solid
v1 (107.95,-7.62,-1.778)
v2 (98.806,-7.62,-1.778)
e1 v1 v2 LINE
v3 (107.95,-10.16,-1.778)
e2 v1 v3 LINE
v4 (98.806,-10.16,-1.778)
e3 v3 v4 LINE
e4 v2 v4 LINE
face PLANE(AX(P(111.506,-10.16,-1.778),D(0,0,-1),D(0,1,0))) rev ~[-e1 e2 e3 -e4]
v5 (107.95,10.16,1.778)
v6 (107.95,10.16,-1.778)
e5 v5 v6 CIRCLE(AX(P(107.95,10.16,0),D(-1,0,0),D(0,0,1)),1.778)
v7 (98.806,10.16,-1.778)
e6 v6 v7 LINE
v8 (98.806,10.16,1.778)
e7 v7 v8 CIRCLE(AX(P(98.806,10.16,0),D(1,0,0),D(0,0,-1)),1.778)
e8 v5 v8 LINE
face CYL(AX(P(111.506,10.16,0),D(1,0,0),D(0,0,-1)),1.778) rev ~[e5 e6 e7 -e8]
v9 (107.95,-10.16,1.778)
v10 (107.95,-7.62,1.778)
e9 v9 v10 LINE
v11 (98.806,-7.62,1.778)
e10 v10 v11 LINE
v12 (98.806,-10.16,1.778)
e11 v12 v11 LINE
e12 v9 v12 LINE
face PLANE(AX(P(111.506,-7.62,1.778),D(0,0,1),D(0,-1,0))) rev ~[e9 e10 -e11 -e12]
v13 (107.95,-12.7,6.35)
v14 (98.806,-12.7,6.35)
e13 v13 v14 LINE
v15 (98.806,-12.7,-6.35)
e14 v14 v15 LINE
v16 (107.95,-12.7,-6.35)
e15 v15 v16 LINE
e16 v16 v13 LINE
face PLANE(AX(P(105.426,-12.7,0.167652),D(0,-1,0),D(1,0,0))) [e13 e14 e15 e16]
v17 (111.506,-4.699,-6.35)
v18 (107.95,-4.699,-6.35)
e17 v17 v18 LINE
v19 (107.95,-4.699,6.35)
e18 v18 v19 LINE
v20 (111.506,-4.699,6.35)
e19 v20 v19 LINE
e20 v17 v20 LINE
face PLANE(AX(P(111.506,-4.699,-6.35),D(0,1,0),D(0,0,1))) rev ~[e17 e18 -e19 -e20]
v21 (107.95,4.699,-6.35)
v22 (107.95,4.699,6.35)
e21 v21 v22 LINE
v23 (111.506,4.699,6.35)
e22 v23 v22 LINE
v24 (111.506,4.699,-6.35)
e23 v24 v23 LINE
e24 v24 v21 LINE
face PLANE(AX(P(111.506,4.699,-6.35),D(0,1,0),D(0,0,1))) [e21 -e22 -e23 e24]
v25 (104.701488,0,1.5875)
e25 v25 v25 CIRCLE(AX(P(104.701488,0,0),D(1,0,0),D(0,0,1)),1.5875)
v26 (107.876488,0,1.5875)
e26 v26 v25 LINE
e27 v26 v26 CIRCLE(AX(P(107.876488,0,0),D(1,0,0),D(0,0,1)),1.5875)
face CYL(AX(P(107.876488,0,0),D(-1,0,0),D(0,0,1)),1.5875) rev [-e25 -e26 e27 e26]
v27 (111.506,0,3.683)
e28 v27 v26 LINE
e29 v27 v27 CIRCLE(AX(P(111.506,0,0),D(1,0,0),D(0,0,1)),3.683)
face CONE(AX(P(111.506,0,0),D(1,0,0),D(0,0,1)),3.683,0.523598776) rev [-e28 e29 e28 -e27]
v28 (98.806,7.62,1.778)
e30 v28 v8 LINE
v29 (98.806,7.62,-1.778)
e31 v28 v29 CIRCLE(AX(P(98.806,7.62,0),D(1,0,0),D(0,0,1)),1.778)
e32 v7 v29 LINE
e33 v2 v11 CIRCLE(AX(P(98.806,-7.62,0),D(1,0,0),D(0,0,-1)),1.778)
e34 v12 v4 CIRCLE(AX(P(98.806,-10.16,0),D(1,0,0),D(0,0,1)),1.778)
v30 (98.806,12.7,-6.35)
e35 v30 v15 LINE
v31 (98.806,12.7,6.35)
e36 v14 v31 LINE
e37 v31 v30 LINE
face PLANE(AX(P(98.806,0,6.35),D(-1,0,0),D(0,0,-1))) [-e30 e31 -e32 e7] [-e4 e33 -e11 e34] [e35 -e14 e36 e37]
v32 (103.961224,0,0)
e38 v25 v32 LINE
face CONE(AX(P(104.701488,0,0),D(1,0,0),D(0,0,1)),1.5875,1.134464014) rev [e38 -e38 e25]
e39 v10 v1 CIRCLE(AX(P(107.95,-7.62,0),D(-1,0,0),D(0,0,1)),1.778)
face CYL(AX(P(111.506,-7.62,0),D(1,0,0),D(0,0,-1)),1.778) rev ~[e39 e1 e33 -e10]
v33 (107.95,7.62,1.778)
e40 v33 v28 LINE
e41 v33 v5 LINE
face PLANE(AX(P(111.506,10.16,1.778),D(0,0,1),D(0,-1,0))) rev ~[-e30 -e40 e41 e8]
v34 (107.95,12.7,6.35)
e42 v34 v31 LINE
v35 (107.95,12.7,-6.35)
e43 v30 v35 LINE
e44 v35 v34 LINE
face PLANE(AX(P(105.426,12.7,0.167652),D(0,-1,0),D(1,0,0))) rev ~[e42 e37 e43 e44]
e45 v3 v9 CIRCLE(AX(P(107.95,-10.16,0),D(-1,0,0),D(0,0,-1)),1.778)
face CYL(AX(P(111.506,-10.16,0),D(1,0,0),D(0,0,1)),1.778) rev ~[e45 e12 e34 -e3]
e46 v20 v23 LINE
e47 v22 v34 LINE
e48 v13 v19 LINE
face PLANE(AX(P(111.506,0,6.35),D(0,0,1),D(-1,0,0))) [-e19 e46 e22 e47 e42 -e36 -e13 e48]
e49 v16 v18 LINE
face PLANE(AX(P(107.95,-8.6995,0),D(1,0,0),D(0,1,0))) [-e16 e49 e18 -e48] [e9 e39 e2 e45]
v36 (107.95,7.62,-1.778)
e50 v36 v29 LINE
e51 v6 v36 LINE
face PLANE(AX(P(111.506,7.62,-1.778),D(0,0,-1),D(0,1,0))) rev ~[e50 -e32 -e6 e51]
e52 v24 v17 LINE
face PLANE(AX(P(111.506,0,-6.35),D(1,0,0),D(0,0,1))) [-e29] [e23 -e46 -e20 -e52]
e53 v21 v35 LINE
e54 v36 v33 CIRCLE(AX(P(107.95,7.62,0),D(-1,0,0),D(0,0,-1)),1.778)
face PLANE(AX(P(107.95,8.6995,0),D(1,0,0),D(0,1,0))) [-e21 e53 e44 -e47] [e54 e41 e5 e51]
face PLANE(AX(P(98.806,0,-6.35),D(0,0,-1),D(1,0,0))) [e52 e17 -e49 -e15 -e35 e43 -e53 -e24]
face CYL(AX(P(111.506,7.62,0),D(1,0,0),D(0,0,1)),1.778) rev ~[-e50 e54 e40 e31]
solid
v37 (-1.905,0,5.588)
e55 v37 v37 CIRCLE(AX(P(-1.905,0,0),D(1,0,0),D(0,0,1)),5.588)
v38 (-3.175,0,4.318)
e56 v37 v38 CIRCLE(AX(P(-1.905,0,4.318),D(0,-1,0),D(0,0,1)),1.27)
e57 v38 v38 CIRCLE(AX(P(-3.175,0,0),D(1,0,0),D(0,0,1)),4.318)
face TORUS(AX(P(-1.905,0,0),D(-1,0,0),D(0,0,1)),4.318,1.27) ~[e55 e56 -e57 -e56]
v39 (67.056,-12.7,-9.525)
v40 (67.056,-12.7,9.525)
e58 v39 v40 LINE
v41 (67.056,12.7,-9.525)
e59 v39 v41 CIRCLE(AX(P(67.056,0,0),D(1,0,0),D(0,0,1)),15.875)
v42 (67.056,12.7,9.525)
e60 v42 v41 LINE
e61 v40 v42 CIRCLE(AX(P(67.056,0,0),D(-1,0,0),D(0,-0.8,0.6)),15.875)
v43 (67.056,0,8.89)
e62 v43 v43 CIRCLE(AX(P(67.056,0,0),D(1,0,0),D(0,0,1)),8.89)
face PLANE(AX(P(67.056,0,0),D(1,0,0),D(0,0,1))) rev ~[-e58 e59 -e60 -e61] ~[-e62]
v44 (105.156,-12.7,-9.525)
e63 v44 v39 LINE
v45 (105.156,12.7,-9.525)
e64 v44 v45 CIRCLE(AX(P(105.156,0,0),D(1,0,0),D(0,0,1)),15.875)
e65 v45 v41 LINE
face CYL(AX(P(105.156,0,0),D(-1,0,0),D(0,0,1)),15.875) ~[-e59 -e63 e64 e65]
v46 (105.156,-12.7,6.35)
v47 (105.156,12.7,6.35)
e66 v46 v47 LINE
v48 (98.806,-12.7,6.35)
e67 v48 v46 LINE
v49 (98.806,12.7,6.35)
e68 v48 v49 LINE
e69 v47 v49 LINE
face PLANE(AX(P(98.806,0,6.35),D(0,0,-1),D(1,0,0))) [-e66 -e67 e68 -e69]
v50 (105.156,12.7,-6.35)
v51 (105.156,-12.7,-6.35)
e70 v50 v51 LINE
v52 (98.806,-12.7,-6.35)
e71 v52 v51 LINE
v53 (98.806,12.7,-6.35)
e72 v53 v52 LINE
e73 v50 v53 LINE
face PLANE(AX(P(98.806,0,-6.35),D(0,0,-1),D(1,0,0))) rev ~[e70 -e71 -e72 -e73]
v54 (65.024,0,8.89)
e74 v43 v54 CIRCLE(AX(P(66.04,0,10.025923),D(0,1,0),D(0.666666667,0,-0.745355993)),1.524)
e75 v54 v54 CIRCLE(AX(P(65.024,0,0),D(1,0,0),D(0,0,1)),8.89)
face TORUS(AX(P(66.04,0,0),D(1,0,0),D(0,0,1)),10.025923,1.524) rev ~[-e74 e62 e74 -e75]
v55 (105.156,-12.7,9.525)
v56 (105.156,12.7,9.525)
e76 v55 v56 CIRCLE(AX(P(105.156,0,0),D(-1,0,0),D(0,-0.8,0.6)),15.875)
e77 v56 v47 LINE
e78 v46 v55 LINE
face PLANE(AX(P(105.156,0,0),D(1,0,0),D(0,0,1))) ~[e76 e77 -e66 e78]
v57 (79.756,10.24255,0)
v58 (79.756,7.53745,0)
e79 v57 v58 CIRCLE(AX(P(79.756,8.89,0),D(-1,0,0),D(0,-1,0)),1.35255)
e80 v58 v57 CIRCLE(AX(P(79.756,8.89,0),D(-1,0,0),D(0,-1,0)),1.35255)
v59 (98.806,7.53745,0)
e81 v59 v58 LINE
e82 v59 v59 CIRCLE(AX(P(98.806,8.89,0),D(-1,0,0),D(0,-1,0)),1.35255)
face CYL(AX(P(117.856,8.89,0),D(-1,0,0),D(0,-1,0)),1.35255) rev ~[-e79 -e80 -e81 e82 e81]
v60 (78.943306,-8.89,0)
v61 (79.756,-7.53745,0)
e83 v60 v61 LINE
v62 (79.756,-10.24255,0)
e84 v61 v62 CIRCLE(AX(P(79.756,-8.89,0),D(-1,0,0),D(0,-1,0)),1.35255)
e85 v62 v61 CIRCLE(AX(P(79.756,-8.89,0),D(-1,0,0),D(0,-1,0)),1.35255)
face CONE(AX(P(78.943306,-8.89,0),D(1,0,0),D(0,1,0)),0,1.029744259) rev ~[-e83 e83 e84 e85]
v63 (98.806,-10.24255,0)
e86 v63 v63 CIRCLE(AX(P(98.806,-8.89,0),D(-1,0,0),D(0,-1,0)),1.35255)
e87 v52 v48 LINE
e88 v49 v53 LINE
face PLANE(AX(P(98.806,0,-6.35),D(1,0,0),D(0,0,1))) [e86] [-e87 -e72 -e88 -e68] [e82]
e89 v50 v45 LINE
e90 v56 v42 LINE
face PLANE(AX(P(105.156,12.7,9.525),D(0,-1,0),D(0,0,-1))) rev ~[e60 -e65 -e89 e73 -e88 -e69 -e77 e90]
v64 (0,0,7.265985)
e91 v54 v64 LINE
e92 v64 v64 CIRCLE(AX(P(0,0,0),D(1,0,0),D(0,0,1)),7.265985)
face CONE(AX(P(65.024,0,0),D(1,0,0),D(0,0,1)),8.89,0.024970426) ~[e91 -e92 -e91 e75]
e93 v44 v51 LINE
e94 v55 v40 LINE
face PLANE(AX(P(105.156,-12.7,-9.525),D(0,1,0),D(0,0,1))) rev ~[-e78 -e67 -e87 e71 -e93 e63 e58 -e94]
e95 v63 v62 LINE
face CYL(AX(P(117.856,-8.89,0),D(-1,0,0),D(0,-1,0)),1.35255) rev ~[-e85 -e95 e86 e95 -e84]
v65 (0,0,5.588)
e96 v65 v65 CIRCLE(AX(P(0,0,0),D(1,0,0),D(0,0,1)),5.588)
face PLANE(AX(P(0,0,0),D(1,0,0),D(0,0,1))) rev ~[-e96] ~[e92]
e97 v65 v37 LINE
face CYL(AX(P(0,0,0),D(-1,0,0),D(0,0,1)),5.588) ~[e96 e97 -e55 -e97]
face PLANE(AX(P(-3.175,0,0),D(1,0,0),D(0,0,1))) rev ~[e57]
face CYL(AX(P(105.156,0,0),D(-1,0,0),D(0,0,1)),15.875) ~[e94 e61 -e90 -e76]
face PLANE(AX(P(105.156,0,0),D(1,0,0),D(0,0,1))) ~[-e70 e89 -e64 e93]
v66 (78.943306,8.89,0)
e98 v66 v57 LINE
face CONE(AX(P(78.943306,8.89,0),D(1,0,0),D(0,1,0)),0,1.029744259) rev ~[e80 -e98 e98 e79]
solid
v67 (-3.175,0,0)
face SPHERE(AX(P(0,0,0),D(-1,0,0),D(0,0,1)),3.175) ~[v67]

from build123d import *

# Parameters (mm, degrees)
F2_W      = 6.35
F2_H      = 12.7
F3_DEPTH  = 25.4
F6_DEPTH  = 38.1
F8_D      = 2.7051
F8_DEPTH  = 19.05
F8_TIP    = 0.8126940303
F9_DEPTH  = 12.7
F11_DEPTH = 25.4
F13_W     = 8.001
F13_H     = 12.7
F14_DEPTH = 3.556


# Not quite as in the source:
# - a feature names something its author has since deleted; it is built from what else it names


with BuildPart() as f1:
    # F0 (on Front) → F1 (revolve)
    with BuildSketch(Plane.XZ):
        Polygon((0, 5.588), (0, 0), (65.024, 0), (65.024, 8.89), (0, 7.2659854949), align=None)
        with BuildLine():
            Line((-3.175, 0), (0, 0))
            Line((0, 0), (0, 5.588))
            Line((0, 5.588), (-1.905, 5.588))
            ThreePointArc((-1.905, 5.588), (-2.8030256121, 5.2160256121), (-3.175, 4.318))
            Line((-3.175, 4.318), (-3.175, 0))
        make_face()
        with BuildLine():
            Line((65.024, 8.89), (65.024, 0))
            Line((65.024, 0), (67.056, 0))
            Line((67.056, 0), (67.056, 8.89))
            ThreePointArc((67.056, 8.89), (66.04, 8.5019225326), (65.024, 8.89))
        make_face()
        with BuildLine():
            Line((67.056, 8.89), (67.056, 0))
            Line((67.056, 0), (105.156, 0))
            Line((105.156, 0), (105.156, 15.875))
            Line((105.156, 15.875), (67.056, 15.875))
            Line((67.056, 15.875), (67.056, 11.1618450651))
            ThreePointArc((67.056, 11.1618450651), (67.4312152961, 10.6480929272), (67.564, 10.0259225326))
            ThreePointArc((67.564, 10.0259225326), (67.4312152961, 9.4037521379), (67.056, 8.89))
        make_face()
        with BuildLine():
            Line((67.056, 11.1618450651), (67.056, 8.89))
            ThreePointArc((67.056, 8.89), (67.4312152961, 9.4037521379), (67.564, 10.0259225326))
            ThreePointArc((67.564, 10.0259225326), (67.4312152961, 10.6480929272), (67.056, 11.1618450651))
        make_face()
    revolve(axis=Axis((32.512, 0, 0), (1, 0, 0)))

    # F2 (on Front) → F3 (cut, symmetric)
    with BuildSketch(Plane.XZ):
        with Locations((101.981, 0)):
            Rectangle(F2_W, F2_H)
    extrude(amount=F3_DEPTH, both=True, mode=Mode.SUBTRACT)

    # F4 (on face) → F6 (cut)
    with BuildSketch(Plane.YZ.offset(105.156)):
        with BuildLine():
            Line((-12.7, 6.35), (-14.5496778315, 6.35))
            ThreePointArc((-14.5496778315, 6.35), (-15.875, 0), (-14.5496778315, -6.35))
            ThreePointArc((-14.5496778315, -6.35), (-13.7170110348, -7.9911972363), (-12.7, -9.525))
            Line((-12.7, -9.525), (-12.7, 6.35))
        make_face()
        with BuildLine():
            ThreePointArc((-12.7, 9.525), (-13.7170110348, 7.9911972363), (-14.5496778315, 6.35))
            Line((-14.5496778315, 6.35), (-12.7, 6.35))
            Line((-12.7, 6.35), (-12.7, 9.525))
        make_face()
        with BuildLine():
            Line((14.5496778315, 6.35), (12.7, 6.35))
            Line((12.7, 6.35), (12.7, -9.525))
            ThreePointArc((12.7, -9.525), (13.7170110348, -7.9911972363), (14.5496778315, -6.35))
            ThreePointArc((14.5496778315, -6.35), (15.875, 0), (14.5496778315, 6.35))
        make_face()
        with BuildLine():
            Line((12.7, 9.525), (12.7, 6.35))
            Line((12.7, 6.35), (14.5496778315, 6.35))
            ThreePointArc((14.5496778315, 6.35), (13.7170110348, 7.9911972363), (12.7, 9.525))
        make_face()
    extrude(amount=-F6_DEPTH, mode=Mode.SUBTRACT)

    # F8
    with Locations(Plane.YZ.offset(98.806)):
        with Locations((-8.89, 0), (8.89, 0)):
            Hole(F8_D / 2, depth=F8_DEPTH)
            with Locations((0, 0, -(F8_DEPTH + F8_TIP / 2))):  # 118° drill point
                Cone(0, F8_D / 2, F8_TIP, mode=Mode.SUBTRACT)


with BuildPart() as f9:
    # F5 (on Front) → F9 (new body, symmetric)
    with BuildSketch(Plane.XZ):
        Polygon((98.806, 6.35), (98.806, -6.35), (111.506, -6.35), (111.506, -3.683), (111.506, 0), (103.9612241254, 0), (104.7014875327, 1.5875), (107.8764875327, 1.5875), (111.506, 3.683), (111.506, 6.35), align=None)
        Polygon((103.9612241254, 0), (111.506, 0), (111.506, 3.683), (107.8764875327, 1.5875), (104.7014875327, 1.5875), align=None)
    extrude(amount=F9_DEPTH, both=True)

    # F10 (on face) → F11 (cut)
    with BuildSketch(Plane.YZ.offset(111.506)):
        with BuildLine():
            ThreePointArc((7.62, 1.778), (5.842, 0), (7.62, -1.778))
            Line((7.62, -1.778), (10.16, -1.778))
            ThreePointArc((10.16, -1.778), (11.938, 0), (10.16, 1.778))
            Line((10.16, 1.778), (7.62, 1.778))
        make_face()
        with BuildLine():
            ThreePointArc((-10.16, 1.778), (-11.938, 0), (-10.16, -1.778))
            Line((-10.16, -1.778), (-7.62, -1.778))
            ThreePointArc((-7.62, -1.778), (-5.842, 0), (-7.62, 1.778))
            Line((-7.62, 1.778), (-10.16, 1.778))
        make_face()
    extrude(amount=-F11_DEPTH, mode=Mode.SUBTRACT)

    # F5 (on Front) → F12 (revolve, cut)
    with BuildSketch(Plane.XZ):
        Polygon((103.9612241254, 0), (111.506, 0), (111.506, 3.683), (107.8764875327, 1.5875), (104.7014875327, 1.5875), align=None)
    revolve(axis=Axis((107.7336120627, 0, 0), (1, 0, 0)), mode=Mode.SUBTRACT)

    # F13 (on face) → F14 (cut)
    with BuildSketch(Plane.YZ.offset(111.506)):
        with Locations((8.6995, 0)):
            Rectangle(F13_W, F13_H)
        with BuildLine():
            ThreePointArc((7.62, -1.778), (5.842, 0), (7.62, 1.778))
            Line((7.62, 1.778), (10.16, 1.778))
            ThreePointArc((10.16, 1.778), (11.938, 0), (10.16, -1.778))
            Line((10.16, -1.778), (7.62, -1.778))
        make_face(mode=Mode.SUBTRACT)
        with Locations((-8.6995, 0)):
            Rectangle(F13_W, F13_H)
        with BuildLine():
            Line((-7.62, -1.778), (-10.16, -1.778))
            ThreePointArc((-10.16, -1.778), (-11.938, 0), (-10.16, 1.778))
            Line((-10.16, 1.778), (-7.62, 1.778))
            ThreePointArc((-7.62, 1.778), (-5.842, 0), (-7.62, -1.778))
        make_face(mode=Mode.SUBTRACT)
    extrude(amount=-F14_DEPTH, mode=Mode.SUBTRACT)


with BuildPart() as f16:
    # F15 (on Front) → F16 (revolve)
    with BuildSketch(Plane.XZ):
        with BuildLine():
            Line((-3.175, 0), (3.175, 0))
            ThreePointArc((3.175, 0), (0, 3.175), (-3.175, 0))
        make_face()
    revolve(axis=Axis((0, 0, 0), (1, 0, 0)))


solid = Compound([f1.part, f9.part, f16.part])
